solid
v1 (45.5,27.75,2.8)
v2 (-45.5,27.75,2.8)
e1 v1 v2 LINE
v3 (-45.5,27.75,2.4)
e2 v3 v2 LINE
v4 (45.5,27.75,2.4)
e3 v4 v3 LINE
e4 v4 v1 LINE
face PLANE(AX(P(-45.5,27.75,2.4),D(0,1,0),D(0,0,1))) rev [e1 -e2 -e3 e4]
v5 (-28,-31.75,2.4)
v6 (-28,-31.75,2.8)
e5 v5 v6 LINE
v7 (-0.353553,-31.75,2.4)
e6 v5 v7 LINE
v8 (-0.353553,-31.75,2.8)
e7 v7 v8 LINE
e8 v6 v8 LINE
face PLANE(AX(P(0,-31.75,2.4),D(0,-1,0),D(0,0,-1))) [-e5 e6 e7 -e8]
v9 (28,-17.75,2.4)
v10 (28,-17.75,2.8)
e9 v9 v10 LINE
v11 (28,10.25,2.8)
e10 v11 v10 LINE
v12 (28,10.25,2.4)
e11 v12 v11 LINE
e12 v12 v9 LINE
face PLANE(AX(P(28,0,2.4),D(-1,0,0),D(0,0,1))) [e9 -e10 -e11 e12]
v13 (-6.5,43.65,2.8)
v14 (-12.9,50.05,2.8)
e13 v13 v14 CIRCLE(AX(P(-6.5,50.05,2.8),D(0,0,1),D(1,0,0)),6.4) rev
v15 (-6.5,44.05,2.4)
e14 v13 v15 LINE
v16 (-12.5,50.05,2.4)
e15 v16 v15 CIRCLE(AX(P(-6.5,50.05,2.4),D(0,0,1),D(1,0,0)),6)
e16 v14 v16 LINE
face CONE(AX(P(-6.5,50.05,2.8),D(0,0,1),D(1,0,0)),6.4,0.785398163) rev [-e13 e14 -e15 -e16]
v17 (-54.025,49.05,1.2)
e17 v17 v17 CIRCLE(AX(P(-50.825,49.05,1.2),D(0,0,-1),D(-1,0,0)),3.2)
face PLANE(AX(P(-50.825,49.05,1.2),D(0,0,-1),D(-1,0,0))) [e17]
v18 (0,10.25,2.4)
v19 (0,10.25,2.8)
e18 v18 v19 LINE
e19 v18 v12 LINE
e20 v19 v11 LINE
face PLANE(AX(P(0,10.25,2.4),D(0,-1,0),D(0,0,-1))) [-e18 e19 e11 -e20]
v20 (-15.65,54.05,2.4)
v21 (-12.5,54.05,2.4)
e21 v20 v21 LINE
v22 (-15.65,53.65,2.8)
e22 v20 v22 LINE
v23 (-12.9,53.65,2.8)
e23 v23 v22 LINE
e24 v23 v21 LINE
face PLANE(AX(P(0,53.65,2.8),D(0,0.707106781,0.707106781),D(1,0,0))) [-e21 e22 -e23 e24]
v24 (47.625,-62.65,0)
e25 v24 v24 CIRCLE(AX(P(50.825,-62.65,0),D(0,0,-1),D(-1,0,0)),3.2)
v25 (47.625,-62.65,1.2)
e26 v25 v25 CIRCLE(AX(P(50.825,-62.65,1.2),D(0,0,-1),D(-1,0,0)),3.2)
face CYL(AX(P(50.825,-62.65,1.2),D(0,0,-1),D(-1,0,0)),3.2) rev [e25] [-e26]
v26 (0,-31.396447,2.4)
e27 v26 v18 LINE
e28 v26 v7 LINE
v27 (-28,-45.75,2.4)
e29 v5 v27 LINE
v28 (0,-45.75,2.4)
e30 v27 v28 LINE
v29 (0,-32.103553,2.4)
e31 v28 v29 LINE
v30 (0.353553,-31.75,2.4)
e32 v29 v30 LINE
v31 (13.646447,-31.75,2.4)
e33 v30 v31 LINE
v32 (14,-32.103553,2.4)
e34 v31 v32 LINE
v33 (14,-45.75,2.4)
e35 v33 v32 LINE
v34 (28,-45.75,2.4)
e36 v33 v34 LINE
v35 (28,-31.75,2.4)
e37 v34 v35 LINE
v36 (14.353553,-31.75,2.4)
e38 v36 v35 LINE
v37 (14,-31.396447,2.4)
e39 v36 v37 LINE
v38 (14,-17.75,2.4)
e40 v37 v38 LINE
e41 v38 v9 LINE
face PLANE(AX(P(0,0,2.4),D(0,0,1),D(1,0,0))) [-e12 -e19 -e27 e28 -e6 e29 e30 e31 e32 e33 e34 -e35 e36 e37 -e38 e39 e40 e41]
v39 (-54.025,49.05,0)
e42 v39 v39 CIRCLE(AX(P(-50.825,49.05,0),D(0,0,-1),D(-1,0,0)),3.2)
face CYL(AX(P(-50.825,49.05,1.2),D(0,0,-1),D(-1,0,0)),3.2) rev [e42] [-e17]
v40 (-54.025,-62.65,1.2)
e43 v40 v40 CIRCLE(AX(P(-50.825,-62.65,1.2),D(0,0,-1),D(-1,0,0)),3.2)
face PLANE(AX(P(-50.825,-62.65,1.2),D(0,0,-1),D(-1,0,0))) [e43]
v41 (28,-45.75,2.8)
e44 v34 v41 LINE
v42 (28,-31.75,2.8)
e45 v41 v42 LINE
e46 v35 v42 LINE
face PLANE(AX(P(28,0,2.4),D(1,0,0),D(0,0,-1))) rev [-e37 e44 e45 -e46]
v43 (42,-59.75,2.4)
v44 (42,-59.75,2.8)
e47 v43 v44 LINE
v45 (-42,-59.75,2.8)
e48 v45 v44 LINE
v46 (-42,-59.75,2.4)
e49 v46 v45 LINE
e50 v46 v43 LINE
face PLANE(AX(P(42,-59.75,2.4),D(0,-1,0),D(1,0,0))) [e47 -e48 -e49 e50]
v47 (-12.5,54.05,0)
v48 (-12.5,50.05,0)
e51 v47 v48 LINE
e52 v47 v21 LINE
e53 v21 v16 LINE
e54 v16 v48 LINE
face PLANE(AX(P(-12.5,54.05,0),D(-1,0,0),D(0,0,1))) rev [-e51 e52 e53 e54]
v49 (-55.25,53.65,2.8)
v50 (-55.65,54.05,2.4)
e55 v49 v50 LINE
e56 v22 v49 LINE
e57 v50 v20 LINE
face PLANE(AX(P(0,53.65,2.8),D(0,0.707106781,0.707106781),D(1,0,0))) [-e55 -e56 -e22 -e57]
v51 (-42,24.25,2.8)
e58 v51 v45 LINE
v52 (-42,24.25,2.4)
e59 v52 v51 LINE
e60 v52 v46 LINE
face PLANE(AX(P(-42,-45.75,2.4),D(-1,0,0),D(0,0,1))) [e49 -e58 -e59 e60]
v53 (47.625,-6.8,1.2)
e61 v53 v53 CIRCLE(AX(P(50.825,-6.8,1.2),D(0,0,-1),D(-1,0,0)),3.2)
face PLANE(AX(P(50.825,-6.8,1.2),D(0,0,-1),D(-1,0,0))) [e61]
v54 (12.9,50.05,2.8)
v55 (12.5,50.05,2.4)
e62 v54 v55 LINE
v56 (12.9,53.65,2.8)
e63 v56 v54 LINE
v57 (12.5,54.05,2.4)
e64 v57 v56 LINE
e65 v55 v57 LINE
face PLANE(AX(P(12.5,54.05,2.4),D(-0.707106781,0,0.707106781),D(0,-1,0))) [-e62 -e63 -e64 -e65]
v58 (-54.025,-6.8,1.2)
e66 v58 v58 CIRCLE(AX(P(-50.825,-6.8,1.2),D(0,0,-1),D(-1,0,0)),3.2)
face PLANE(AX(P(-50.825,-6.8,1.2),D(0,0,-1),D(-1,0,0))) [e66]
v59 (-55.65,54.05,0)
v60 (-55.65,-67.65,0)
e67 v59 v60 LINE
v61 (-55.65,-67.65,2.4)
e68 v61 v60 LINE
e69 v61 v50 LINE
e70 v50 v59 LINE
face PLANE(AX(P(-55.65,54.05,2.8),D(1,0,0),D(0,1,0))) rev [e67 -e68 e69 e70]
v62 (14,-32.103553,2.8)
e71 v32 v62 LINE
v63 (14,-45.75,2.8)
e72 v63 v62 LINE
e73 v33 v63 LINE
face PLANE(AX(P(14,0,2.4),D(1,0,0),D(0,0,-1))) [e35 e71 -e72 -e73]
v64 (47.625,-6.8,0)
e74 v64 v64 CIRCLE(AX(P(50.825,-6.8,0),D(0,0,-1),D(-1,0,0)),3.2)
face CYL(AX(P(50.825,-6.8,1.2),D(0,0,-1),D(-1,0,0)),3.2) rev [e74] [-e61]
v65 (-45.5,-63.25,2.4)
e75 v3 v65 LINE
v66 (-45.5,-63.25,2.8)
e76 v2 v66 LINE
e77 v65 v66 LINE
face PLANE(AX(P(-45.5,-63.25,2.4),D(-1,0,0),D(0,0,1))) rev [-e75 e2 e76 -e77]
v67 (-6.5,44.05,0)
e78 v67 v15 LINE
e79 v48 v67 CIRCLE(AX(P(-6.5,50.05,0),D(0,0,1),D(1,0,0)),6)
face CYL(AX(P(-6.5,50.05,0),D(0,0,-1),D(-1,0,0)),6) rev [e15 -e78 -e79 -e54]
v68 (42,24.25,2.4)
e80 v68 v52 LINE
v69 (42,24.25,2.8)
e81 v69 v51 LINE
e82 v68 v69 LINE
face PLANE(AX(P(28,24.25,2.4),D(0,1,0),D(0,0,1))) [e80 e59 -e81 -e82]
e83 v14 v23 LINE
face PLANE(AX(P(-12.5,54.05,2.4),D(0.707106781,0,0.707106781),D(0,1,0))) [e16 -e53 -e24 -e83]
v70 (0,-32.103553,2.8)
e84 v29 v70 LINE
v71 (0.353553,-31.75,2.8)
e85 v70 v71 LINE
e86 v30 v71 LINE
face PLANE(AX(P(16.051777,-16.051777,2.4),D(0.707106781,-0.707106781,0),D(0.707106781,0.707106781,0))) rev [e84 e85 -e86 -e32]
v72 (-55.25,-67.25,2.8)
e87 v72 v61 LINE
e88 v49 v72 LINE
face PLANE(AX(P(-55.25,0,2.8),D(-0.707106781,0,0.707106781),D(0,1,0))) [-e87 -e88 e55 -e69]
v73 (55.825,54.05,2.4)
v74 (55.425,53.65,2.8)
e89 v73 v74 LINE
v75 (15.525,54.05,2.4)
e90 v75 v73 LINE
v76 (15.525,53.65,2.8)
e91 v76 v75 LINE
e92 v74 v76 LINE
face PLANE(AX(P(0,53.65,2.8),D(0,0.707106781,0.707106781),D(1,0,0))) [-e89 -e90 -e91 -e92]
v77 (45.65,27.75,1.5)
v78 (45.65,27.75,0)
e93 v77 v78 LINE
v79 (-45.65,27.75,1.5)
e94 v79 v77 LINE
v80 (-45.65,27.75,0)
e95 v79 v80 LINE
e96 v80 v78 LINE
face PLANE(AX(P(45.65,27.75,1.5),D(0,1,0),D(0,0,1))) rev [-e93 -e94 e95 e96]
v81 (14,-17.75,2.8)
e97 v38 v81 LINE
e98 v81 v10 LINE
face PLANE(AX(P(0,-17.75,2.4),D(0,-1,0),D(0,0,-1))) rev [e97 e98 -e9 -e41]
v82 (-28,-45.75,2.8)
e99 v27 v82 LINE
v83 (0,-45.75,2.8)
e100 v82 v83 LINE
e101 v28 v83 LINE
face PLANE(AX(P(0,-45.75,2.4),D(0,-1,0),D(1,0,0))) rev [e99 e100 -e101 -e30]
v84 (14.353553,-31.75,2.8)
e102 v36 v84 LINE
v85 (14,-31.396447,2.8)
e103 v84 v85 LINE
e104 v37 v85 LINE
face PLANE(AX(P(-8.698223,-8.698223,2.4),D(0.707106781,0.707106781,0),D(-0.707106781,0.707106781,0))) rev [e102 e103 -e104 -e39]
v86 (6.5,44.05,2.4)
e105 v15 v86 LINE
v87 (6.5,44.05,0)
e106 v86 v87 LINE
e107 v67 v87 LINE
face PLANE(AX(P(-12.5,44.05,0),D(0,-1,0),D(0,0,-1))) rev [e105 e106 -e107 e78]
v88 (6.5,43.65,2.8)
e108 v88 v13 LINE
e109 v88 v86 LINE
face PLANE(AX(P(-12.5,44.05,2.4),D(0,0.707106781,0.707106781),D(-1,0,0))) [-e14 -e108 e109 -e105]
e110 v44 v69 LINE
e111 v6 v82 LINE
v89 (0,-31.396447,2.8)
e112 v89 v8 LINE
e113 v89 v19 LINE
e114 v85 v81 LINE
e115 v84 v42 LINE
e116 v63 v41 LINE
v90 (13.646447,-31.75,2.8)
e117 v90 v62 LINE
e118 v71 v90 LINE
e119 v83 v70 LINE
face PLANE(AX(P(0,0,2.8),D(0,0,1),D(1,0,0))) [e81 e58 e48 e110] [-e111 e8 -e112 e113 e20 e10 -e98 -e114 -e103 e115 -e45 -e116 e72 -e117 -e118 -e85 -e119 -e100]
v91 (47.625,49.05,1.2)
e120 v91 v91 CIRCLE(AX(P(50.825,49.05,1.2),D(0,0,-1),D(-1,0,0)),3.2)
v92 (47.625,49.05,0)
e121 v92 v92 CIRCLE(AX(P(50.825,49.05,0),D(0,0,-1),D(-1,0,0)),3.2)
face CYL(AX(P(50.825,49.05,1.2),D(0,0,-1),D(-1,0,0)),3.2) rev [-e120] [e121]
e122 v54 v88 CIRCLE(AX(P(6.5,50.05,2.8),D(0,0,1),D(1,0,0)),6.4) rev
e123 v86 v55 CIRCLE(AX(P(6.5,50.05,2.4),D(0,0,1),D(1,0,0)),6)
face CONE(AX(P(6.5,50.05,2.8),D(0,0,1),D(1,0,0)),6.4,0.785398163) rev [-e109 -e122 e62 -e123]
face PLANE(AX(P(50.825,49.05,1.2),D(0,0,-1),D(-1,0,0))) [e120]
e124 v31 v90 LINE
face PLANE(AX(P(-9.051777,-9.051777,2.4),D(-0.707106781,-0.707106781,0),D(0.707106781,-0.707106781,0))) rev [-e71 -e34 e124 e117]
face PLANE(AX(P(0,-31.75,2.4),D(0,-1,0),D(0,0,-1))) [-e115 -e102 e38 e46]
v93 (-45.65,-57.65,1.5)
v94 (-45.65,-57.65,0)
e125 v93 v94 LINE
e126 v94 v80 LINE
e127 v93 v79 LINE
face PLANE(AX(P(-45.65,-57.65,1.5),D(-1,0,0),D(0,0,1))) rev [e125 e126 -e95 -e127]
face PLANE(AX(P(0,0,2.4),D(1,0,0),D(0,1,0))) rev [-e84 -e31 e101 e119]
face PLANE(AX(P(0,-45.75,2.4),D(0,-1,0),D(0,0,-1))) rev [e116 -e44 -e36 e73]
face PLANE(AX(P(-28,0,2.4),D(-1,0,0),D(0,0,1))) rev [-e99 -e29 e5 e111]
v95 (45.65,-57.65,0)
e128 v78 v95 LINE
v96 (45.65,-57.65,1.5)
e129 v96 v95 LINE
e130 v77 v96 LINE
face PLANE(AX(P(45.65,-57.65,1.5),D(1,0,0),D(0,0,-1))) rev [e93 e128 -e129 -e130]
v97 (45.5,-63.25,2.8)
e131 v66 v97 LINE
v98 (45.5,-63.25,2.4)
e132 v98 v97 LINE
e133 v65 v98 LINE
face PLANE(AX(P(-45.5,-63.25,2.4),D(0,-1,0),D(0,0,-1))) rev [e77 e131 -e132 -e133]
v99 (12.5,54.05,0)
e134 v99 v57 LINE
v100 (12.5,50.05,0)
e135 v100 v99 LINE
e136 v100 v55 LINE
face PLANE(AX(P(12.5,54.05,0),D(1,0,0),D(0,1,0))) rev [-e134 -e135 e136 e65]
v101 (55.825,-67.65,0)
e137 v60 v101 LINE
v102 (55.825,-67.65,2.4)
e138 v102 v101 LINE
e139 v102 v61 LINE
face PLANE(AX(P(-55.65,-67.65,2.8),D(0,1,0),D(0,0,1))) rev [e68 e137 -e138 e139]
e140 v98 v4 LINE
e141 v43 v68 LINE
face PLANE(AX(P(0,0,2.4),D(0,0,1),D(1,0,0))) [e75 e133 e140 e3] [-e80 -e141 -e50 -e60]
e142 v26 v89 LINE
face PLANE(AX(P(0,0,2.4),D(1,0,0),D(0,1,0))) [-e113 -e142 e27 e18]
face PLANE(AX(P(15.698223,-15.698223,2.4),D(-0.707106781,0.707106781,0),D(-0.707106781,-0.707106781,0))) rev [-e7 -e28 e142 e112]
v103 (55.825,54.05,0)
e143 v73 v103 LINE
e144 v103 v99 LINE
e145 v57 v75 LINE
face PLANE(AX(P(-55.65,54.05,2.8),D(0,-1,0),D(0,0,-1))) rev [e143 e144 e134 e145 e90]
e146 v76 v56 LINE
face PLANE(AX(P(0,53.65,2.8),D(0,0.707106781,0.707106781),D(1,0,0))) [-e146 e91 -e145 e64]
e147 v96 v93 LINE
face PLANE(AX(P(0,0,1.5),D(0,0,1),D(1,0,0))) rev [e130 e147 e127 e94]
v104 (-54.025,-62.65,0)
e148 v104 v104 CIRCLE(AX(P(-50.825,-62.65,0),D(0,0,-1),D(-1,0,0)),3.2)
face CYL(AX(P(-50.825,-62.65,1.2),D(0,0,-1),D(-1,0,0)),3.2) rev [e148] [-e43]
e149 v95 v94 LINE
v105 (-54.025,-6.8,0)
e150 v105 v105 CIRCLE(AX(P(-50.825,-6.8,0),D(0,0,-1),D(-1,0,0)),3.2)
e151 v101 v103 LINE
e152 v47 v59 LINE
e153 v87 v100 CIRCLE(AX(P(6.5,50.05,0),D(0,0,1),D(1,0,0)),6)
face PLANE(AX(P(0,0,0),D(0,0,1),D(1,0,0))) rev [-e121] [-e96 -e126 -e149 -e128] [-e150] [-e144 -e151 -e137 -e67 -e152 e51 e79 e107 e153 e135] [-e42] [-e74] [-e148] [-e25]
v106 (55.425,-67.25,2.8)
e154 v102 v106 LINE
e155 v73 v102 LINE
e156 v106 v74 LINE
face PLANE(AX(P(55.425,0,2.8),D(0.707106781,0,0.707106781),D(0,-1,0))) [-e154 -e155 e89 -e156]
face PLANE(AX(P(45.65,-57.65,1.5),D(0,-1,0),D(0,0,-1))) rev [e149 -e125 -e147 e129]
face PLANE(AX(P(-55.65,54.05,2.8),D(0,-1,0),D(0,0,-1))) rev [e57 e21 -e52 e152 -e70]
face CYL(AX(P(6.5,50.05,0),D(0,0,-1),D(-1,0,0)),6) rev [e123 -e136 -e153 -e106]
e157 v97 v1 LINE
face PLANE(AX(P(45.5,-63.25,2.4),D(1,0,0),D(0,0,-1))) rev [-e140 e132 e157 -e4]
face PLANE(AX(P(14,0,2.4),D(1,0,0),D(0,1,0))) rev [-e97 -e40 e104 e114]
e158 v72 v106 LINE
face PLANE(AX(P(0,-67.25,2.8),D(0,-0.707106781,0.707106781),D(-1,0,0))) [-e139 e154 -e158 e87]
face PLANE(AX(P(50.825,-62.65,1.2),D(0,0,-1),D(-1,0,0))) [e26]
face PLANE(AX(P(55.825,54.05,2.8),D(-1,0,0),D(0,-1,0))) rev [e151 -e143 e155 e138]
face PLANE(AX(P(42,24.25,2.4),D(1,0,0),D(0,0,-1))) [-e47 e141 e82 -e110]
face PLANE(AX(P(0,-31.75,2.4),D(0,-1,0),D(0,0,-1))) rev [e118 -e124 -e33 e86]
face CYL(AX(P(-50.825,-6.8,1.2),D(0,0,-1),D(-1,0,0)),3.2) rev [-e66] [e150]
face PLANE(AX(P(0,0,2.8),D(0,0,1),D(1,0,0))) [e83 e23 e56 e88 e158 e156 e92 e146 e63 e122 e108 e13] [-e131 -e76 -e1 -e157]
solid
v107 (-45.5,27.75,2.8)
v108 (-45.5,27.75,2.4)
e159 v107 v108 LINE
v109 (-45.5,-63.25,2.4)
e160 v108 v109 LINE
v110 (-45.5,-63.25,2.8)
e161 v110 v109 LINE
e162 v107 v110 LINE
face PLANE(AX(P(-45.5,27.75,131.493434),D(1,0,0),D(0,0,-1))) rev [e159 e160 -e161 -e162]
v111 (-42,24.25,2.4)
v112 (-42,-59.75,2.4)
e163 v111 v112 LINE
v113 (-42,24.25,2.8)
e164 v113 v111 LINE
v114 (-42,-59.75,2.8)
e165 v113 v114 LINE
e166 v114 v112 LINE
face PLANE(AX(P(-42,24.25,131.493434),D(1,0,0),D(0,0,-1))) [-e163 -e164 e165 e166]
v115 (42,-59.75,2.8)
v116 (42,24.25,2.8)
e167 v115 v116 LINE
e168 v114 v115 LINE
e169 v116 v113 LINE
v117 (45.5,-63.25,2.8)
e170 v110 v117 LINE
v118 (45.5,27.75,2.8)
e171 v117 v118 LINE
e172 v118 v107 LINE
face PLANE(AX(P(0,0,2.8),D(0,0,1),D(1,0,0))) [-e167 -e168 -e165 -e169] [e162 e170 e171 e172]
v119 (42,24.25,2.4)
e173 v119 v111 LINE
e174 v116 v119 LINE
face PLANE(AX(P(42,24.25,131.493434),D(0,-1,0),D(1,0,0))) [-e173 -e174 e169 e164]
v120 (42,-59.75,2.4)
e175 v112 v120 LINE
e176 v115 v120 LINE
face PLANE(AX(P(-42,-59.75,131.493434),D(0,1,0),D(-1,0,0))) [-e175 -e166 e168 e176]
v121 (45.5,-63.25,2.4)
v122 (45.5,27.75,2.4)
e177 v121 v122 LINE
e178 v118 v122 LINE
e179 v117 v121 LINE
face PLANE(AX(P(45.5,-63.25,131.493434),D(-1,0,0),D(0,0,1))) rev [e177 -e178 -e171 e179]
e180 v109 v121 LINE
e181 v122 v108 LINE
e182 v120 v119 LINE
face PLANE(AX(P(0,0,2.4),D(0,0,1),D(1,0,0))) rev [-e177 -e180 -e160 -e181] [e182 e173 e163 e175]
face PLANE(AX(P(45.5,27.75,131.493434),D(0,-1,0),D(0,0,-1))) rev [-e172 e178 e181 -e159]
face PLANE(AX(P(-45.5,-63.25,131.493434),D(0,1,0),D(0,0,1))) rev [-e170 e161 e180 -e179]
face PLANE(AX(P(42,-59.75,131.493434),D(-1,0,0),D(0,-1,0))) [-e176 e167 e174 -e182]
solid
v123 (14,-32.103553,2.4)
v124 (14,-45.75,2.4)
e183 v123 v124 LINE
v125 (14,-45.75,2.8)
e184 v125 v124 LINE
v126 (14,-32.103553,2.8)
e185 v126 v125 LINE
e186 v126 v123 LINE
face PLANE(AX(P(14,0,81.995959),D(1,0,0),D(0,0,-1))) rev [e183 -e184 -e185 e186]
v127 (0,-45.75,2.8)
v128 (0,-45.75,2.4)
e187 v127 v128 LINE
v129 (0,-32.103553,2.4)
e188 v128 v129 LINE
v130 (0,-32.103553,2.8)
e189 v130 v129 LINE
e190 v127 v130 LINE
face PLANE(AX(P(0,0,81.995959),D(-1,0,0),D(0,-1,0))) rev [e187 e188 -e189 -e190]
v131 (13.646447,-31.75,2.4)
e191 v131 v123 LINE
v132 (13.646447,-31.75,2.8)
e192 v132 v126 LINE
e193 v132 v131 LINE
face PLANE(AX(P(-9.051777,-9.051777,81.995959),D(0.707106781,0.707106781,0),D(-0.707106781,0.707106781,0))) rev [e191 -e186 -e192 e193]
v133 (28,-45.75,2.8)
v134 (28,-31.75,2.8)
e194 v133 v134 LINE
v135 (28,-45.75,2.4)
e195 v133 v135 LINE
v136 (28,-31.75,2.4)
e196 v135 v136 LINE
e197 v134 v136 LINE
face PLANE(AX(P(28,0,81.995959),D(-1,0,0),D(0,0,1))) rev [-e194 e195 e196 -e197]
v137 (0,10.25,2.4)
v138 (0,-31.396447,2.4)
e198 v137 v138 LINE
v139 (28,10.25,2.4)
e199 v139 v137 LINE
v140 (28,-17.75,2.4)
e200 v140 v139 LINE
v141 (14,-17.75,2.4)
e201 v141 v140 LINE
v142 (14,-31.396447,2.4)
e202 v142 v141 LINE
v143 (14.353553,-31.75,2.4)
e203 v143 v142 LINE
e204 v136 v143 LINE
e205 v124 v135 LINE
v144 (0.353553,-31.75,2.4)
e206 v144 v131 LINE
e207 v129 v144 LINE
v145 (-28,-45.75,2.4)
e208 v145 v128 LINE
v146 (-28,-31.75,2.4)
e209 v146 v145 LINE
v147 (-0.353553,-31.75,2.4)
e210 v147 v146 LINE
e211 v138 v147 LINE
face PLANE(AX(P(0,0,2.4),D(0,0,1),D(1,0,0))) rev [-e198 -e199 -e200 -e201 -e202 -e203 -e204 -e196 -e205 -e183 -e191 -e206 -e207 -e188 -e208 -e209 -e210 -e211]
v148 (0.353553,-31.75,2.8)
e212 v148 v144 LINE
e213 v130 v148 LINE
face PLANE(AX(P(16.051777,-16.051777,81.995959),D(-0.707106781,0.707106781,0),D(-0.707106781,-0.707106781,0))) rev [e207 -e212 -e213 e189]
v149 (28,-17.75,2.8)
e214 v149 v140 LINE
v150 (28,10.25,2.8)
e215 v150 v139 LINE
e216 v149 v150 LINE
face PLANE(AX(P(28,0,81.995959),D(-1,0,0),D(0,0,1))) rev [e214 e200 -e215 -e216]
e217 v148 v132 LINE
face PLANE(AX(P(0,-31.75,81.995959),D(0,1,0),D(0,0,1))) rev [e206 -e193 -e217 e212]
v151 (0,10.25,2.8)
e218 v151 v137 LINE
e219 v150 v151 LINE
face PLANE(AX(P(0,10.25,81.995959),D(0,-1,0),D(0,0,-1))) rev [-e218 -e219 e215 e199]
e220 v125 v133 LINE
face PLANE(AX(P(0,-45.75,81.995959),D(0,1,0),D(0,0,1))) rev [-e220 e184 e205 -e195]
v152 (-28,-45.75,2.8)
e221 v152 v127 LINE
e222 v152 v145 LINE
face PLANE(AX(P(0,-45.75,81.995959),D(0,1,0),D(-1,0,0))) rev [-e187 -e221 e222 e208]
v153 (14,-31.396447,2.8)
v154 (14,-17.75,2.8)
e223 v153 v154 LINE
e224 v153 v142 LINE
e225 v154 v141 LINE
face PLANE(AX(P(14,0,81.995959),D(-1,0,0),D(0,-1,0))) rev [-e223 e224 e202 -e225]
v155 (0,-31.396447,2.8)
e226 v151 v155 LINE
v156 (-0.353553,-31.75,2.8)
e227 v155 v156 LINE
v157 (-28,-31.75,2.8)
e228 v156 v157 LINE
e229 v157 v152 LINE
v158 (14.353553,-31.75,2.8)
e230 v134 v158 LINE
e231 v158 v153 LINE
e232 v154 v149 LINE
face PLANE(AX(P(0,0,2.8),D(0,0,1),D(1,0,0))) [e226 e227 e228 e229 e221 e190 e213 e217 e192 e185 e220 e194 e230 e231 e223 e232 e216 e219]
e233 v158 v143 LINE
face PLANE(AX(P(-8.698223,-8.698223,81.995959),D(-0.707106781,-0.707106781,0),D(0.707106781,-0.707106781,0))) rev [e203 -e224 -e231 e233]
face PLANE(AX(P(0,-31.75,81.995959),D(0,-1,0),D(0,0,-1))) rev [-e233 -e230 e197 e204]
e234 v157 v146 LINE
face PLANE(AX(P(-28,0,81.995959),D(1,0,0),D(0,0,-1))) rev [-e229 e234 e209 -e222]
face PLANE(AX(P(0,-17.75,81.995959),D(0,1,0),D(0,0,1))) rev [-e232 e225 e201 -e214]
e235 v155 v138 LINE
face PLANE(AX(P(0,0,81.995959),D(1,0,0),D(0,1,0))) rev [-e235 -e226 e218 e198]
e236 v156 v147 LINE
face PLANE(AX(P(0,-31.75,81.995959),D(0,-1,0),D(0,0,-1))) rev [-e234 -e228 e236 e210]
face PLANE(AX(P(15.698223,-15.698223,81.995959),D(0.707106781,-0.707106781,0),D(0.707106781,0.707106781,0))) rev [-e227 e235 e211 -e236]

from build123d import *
from build123d.topology import SkipClean

# Parameters (mm, degrees)
SKETCH1_R           = 1.35
BOSS_EXTRUDE1_DEPTH = 2.8
SKETCH3_R           = 2.5
CUT_EXTRUDE1_DEPTH  = 2.2
SKETCH4_W           = 91.3
SKETCH4_H           = 85.4
CUT_EXTRUDE2_DEPTH  = 1.5
CUT_EXTRUDE3_DEPTH  = 0.2
SKETCH6_W           = 2.7
SKETCH6_H           = 2.7
CUT_EXTRUDE4_DEPTH  = 0.2
CHAMFER1_SIZE       = 0.4
SKETCH7_W           = 91
SKETCH7_H           = 91
CUT_EXTRUDE5_DEPTH  = 0.4
SKETCH8_W           = 91
SKETCH8_H           = 91
SKETCH8_W_2         = 84
SKETCH8_H_2         = 84
BOSS_EXTRUDE2_DEPTH = 0.4
CUT_EXTRUDE6_DEPTH  = 0.4
BOSS_EXTRUDE3_DEPTH = 0.4
BOSS_EXTRUDE4_START = -2.8
SKETCH11_W          = 31.175
SKETCH11_H          = 25.7
BOSS_EXTRUDE4_DEPTH = 2.8
CHAMFER2_SIZE       = 0.4
SKETCH12_R          = 2.5
BOSS_EXTRUDE5_DEPTH = 2.8
SKETCH13_R          = 3.2
CUT_EXTRUDE7_DEPTH  = 1.2
SKETCH14_W          = 25
SKETCH14_H          = 10
CUT_EXTRUDE8_DEPTH  = 88.754163007
FILLET1_R           = 6
CHAMFER3_SIZE       = 0.4


with BuildPart() as part:
    # Sketch1 → Boss-Extrude1 (new body)
    with BuildSketch(Plane.XY):
        Polygon((-15.25, 54.05), (-15.25, 28.75), (15.125, 28.75), (15.125, 54.05), (55.825, 54.05), (55.825, -67.65), (-55.65, -67.65), (-55.65, 54.05), align=None)
        with Locations((-52, 50)):
            Circle(SKETCH1_R, mode=Mode.SUBTRACT)
        with Locations((-52, 2.9)):
            Circle(SKETCH1_R, mode=Mode.SUBTRACT)
        with Locations((-52, -64)):
            Circle(SKETCH1_R, mode=Mode.SUBTRACT)
        with Locations((52, 50)):
            Circle(SKETCH1_R, mode=Mode.SUBTRACT)
        with Locations((52, 2.9)):
            Circle(SKETCH1_R, mode=Mode.SUBTRACT)
        with Locations((52, -64)):
            Circle(SKETCH1_R, mode=Mode.SUBTRACT)
    extrude(amount=BOSS_EXTRUDE1_DEPTH)

    # Sketch3 → Cut-Extrude1 (cut)
    with BuildSketch(Plane.XY.offset(2.8)):
        with Locations((-52, 50)):
            Circle(SKETCH3_R)
        with Locations((-52, 2.9)):
            Circle(SKETCH3_R)
        with Locations((-52, -64)):
            Circle(SKETCH3_R)
        with Locations((52, -64)):
            Circle(SKETCH3_R)
        with Locations((52, 2.9)):
            Circle(SKETCH3_R)
        with Locations((52, 50)):
            Circle(SKETCH3_R)
    extrude(amount=-CUT_EXTRUDE1_DEPTH, mode=Mode.SUBTRACT)

    # Sketch4 → Cut-Extrude2 (cut)
    with BuildSketch(Plane(origin=(0, 0, 0), x_dir=(-1, 0, 0), z_dir=(0, 0, -1))):
        with Locations((0, -14.95)):
            Rectangle(SKETCH4_W, SKETCH4_H)
    extrude(amount=-CUT_EXTRUDE2_DEPTH, mode=Mode.SUBTRACT)

    # Sketch5 → Cut-Extrude3 (cut)
    with SkipClean():  # the faces are left unmerged after this step: merging them gives an invalid solid
        with BuildSketch(Plane.XY.offset(0.6)):
            with BuildLine():
                Line((-53.35, 47.895837459), (-53.35, 52.104162541))
                ThreePointArc((-53.35, 52.104162541), (-52, 52.5), (-50.65, 52.104162541))
                Line((-50.65, 52.104162541), (-50.65, 47.895837459))
                ThreePointArc((-50.65, 47.895837459), (-52, 47.5), (-53.35, 47.895837459))
            make_face()
            with BuildLine():
                Line((-53.35, 0.795837459), (-53.35, 5.004162541))
                ThreePointArc((-53.35, 5.004162541), (-52, 5.4), (-50.65, 5.004162541))
                Line((-50.65, 5.004162541), (-50.65, 0.795837459))
                ThreePointArc((-50.65, 0.795837459), (-52, 0.4), (-53.35, 0.795837459))
            make_face()
            with BuildLine():
                Line((-53.35, -66.104162541), (-53.35, -61.895837459))
                ThreePointArc((-53.35, -61.895837459), (-52, -61.5), (-50.65, -61.895837459))
                Line((-50.65, -61.895837459), (-50.65, -66.104162541))
                ThreePointArc((-50.65, -66.104162541), (-52, -66.5), (-53.35, -66.104162541))
            make_face()
        cut_extrude3 = extrude(amount=-CUT_EXTRUDE3_DEPTH, mode=Mode.SUBTRACT)

    # Sketch6 → Cut-Extrude4 (cut)
    with SkipClean():  # the faces are left unmerged after this step: merging them gives an invalid solid
        with BuildSketch(Plane.XY.offset(0.4)):
            with Locations((-52, -64)):
                Rectangle(SKETCH6_W, SKETCH6_H)
            with Locations((-52, 2.9)):
                Rectangle(SKETCH6_W, SKETCH6_H)
            with Locations((-52, 50)):
                Rectangle(SKETCH6_W, SKETCH6_H)
        cut_extrude4 = extrude(amount=-CUT_EXTRUDE4_DEPTH, mode=Mode.SUBTRACT)

    # Mirror1: Cut-Extrude3, Cut-Extrude4 across plane
    with SkipClean():  # the faces are left unmerged after this step: merging them gives an invalid solid
        add(cut_extrude3.mirror(Plane(origin=(0, 0, 0), x_dir=(0, 0, 1), z_dir=(1, 0, 0))), mode=Mode.SUBTRACT)
        add(cut_extrude4.mirror(Plane(origin=(0, 0, 0), x_dir=(0, 0, 1), z_dir=(1, 0, 0))), mode=Mode.SUBTRACT)

    # Chamfer1
    chamfer1_edges = [part.edges().sort_by_distance(p)[0] for p in [
        (55.825, -6.8, 2.8),
        (35.475, 54.05, 2.8),
        (15.125, 41.4, 2.8),
        (-0.0625, 28.75, 2.8),
        (-15.25, 41.4, 2.8),
        (-35.45, 54.05, 2.8),
        (-55.65, -6.8, 2.8),
        (0.0875, -67.65, 2.8),
    ]]
    chamfer(chamfer1_edges, length=CHAMFER1_SIZE)

    # Sketch7 → Cut-Extrude5 (cut)
    with SkipClean():  # the faces are left unmerged after this step: merging them gives an invalid solid
        with BuildSketch(Plane.XY.offset(2.8)):
            with Locations((0, -17.75)):
                Rectangle(SKETCH7_W, SKETCH7_H)
            Polygon((28, 24.25), (42, 24.25), (42, 10.25), (42, -3.75), (42, -17.75), (42, -31.75), (42, -45.75), (42, -59.75), (28, -59.75), (14, -59.75), (0, -59.75), (-14, -59.75), (-28, -59.75), (-42, -59.75), (-42, -45.75), (-42, -31.75), (-42, -17.75), (-42, -3.75), (-42, 10.25), (-42, 24.25), (-28, 24.25), (-14, 24.25), (0, 24.25), (14, 24.25), align=None, mode=Mode.SUBTRACT)
        extrude(amount=-CUT_EXTRUDE5_DEPTH, mode=Mode.SUBTRACT)

    # Sketch9 → Cut-Extrude6 (cut)
    with SkipClean():  # the faces are left unmerged after this step: merging them gives an invalid solid
        with BuildSketch(Plane.XY.offset(2.8)):
            Polygon((-28, -31.75), (-28, -45.75), (-14, -45.75), (0, -45.75), (0, -32.103553391), (0.353553391, -31.75), (13.646446609, -31.75), (14, -32.103553391), (14, -45.75), (28, -45.75), (28, -31.75), (14.353553391, -31.75), (14, -31.396446609), (14, -17.75), (28, -17.75), (28, -3.75), (28, 10.25), (14, 10.25), (0, 10.25), (0, -3.75), (0, -17.75), (0, -31.396446609), (-0.353553391, -31.75), (-14, -31.75), align=None)
        extrude(amount=-CUT_EXTRUDE6_DEPTH, mode=Mode.SUBTRACT)

    # Sketch11 → Boss-Extrude4 (add)
    with SkipClean():  # the faces are left unmerged after this step: merging them gives an invalid solid
        with BuildSketch(Plane.XY.offset(2.8).offset(BOSS_EXTRUDE4_START)):
            with Locations((-0.0625, 41.2)):
                Rectangle(SKETCH11_W, SKETCH11_H)
        extrude(amount=BOSS_EXTRUDE4_DEPTH)

    # Chamfer2
    chamfer2_edges = [part.edges().sort_by_distance(p)[0] for p in [
        (-0.0625, 54.05, 2.8),
    ]]
    chamfer(chamfer2_edges, length=CHAMFER2_SIZE - 0.0001)  # a hair under: the kernel refuses the full size

    # Sketch12 → Boss-Extrude5 (add)
    with BuildSketch(Plane.XY.offset(2.8)):
        with Locations((52, -64)):
            Circle(SKETCH12_R)
        with Locations((52, 50)):
            Circle(SKETCH12_R)
        with Locations((52, 2.9)):
            Circle(SKETCH12_R)
        with Locations((-52, -64)):
            Circle(SKETCH12_R)
        with Locations((-52, 2.9)):
            Circle(SKETCH12_R)
        with Locations((-52, 50)):
            Circle(SKETCH12_R)
    extrude(amount=-BOSS_EXTRUDE5_DEPTH)

    # Sketch13 → Cut-Extrude7 (cut)
    with BuildSketch(Plane(origin=(0, 0, 0), x_dir=(-1, 0, 0), z_dir=(0, 0, -1))):
        with Locations((-50.825, 49.05)):
            Circle(SKETCH13_R)
        with Locations((50.825, 49.05)):
            Circle(SKETCH13_R)
        with Locations((50.825, -62.65)):
            Circle(SKETCH13_R)
        with Locations((-50.825, -62.65)):
            Circle(SKETCH13_R)
        with Locations((-50.825, -6.8)):
            Circle(SKETCH13_R)
        with Locations((50.825, -6.8)):
            Circle(SKETCH13_R)
    extrude(amount=-CUT_EXTRUDE7_DEPTH, mode=Mode.SUBTRACT)

    # Sketch14 → Cut-Extrude8 (cut, through all)
    with BuildSketch(Plane.XY.offset(2.8)):
        with Locations((0, 49.05)):
            Rectangle(SKETCH14_W, SKETCH14_H)
    extrude(amount=-CUT_EXTRUDE8_DEPTH, mode=Mode.SUBTRACT)

    # Fillet1
    fillet1_edges = [part.edges().sort_by_distance(p)[0] for p in [
        (-12.5, 44.05, 1.4),
        (12.5, 44.05, 1.4),
    ]]
    fillet(fillet1_edges, radius=FILLET1_R)

    # Chamfer3
    chamfer3_edges = [part.edges().sort_by_distance(p)[0] for p in [
        (-12.5, 51.85005, 2.8),
        (12.5, 51.85005, 2.8),
        (0, 44.05, 2.8),
        (10.742640687, 45.807359313, 2.8),
        (-10.742640687, 45.807359313, 2.8),
    ]]
    chamfer(chamfer3_edges, length=CHAMFER3_SIZE)


with BuildPart() as body_2:
    # Sketch8 → Boss-Extrude2 (new body)
    with BuildSketch(Plane.XY.offset(2.4)):
        with Locations((0, -17.75)):
            Rectangle(SKETCH8_W, SKETCH8_H)
        with Locations((0, -17.75)):
            Rectangle(SKETCH8_W_2, SKETCH8_H_2, mode=Mode.SUBTRACT)
    extrude(amount=BOSS_EXTRUDE2_DEPTH)


with BuildPart() as body_3:
    # Sketch10 → Boss-Extrude3 (new body)
    with BuildSketch(Plane.XY.offset(2.4)):
        Polygon((28, -31.75), (14.353553391, -31.75), (14, -31.396446609), (14, -17.75), (28, -17.75), (28, 10.25), (0, 10.25), (0, -31.396446609), (-0.353553391, -31.75), (-28, -31.75), (-28, -45.75), (0, -45.75), (0, -32.103553391), (0.353553391, -31.75), (13.646446609, -31.75), (14, -32.103553391), (14, -45.75), (28, -45.75), align=None)
    extrude(amount=BOSS_EXTRUDE3_DEPTH)


solid = Compound([part.part, body_2.part, body_3.part])
